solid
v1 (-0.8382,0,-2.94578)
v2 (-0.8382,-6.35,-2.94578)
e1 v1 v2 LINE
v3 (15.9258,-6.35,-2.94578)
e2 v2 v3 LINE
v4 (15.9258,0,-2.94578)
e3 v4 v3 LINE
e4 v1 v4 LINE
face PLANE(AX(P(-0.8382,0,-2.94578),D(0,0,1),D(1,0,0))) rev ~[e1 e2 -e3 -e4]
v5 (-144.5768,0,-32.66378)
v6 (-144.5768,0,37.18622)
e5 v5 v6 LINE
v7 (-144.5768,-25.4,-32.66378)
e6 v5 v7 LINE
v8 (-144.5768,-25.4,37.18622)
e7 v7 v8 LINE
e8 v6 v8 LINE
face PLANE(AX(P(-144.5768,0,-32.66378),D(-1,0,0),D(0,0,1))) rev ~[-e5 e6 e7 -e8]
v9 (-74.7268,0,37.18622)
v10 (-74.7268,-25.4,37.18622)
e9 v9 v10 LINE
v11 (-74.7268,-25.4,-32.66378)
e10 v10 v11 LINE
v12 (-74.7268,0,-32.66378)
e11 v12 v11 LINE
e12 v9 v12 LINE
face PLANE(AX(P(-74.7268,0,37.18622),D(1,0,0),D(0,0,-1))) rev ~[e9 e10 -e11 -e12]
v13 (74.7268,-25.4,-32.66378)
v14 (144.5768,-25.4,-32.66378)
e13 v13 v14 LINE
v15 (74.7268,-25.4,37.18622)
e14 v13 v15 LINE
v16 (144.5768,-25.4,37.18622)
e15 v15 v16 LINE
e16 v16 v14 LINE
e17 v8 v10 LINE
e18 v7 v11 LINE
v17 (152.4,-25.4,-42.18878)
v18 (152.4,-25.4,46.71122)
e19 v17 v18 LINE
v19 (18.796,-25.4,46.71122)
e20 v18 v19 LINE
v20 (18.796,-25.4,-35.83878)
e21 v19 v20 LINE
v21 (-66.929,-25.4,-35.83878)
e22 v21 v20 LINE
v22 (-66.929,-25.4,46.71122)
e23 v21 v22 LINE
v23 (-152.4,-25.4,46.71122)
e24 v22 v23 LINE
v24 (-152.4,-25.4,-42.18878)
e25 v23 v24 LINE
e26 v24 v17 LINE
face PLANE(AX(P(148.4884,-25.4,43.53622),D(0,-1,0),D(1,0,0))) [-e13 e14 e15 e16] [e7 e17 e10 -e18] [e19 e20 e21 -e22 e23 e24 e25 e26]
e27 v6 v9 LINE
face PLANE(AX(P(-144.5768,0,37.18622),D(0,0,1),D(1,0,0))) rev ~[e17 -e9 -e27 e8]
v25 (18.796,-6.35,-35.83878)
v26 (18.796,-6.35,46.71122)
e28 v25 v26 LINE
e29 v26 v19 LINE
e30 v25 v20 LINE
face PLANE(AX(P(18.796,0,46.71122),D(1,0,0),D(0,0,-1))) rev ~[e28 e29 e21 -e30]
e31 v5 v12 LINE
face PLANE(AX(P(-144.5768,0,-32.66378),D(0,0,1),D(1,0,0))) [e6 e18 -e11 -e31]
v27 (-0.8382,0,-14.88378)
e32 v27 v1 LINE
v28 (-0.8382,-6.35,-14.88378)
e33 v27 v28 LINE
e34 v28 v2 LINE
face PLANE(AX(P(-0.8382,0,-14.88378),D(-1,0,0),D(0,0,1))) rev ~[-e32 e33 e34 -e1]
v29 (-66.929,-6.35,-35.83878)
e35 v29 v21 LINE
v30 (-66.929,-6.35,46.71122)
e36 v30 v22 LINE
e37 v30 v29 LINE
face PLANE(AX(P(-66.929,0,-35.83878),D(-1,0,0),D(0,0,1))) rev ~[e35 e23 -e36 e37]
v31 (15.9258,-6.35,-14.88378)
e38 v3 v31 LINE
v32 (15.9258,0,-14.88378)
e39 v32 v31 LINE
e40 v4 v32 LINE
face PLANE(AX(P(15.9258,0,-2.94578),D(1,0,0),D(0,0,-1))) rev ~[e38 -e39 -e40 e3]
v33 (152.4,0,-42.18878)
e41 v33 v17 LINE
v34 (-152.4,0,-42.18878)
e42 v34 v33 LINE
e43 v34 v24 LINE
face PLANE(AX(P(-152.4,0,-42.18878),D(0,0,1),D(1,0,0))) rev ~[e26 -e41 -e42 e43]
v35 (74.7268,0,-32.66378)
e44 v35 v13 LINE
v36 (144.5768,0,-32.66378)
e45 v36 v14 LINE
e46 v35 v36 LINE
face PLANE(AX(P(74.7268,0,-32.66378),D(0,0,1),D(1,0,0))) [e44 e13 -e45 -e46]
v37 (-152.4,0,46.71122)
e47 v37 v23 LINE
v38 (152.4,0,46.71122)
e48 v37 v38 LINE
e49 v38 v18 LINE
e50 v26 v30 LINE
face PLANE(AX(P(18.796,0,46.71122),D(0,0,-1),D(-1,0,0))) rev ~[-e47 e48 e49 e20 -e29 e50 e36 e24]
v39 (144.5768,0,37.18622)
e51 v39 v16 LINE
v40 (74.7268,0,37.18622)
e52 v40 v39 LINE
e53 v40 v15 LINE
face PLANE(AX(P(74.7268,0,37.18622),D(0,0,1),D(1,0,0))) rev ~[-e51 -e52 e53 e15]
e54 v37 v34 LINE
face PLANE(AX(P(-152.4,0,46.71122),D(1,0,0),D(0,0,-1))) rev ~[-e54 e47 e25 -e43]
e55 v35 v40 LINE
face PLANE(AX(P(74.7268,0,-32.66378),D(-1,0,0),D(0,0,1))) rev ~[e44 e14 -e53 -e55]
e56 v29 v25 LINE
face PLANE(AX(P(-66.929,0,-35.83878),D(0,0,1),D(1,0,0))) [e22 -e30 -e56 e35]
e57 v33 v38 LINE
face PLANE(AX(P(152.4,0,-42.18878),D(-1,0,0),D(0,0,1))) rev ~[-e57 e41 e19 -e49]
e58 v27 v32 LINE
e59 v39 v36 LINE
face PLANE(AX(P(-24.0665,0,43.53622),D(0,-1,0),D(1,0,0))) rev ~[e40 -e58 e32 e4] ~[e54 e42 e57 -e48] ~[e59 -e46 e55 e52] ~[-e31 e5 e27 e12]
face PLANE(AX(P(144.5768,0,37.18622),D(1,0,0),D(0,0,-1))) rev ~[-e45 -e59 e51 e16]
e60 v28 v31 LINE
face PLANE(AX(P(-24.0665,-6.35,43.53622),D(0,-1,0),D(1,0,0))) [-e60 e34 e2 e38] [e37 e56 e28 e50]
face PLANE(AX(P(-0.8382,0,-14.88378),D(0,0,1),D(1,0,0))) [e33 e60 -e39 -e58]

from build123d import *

# Parameters (mm, degrees)
F0_W     = 7.8232
F0_H     = 6.35
F0_W_2   = 69.85
F0_H_2   = 3.175
F0_W_3   = 55.9308
F0_H_3   = 69.85
F0_W_4   = 7.7978
F0_H_4   = 12.7
F0_W_5   = 85.725
F1_DEPTH = 25.4
F0_W_6   = 2.8702
F0_H_5   = 5.1918955931
F0_W_7   = 66.0908
F0_H_6   = 4.9097025247
F0_H_7   = 13.4315382606
F0_W_8   = 16.764
F0_H_8   = 0.762
F2_DEPTH = 6.35


with BuildPart() as f1:
    # F0 (on Front) → F1 (new body)
    with BuildSketch(Plane.XZ):
        with Locations((148.4884, 43.5362195122)):
            Rectangle(F0_W, F0_H)
        with Locations((109.6518, 43.5362195122)):
            Rectangle(F0_W_2, F0_H)
        with Locations((148.4884, 38.7737195122)):
            Rectangle(F0_W, F0_H_2)
        with Locations((46.7614, 43.5362195122)):
            Rectangle(F0_W_3, F0_H)
        with Locations((109.6518, 38.7737195122)):
            Rectangle(F0_W_2, F0_H_2)
        with Locations((148.4884, 2.2612195122)):
            Rectangle(F0_W, F0_H_3)
        with Locations((46.7614, 38.7737195122)):
            Rectangle(F0_W_3, F0_H_2)
        with Locations((148.4884, -34.2512804878)):
            Rectangle(F0_W, F0_H_2)
        with Locations((-70.8279, 43.5362195122)):
            Rectangle(F0_W_4, F0_H)
        Polygon((74.7268, -2.1837804878), (74.7268, 37.1862195122), (18.796, 37.1862195122), (18.796, 3.0081151053), (18.796, -2.1837804878), align=None)
        with Locations((109.6518, -34.2512804878)):
            Rectangle(F0_W_2, F0_H_2)
        with Locations((148.4884, -39.0137804878)):
            Rectangle(F0_W, F0_H)
        with Locations((-109.6518, 43.5362195122)):
            Rectangle(F0_W_2, F0_H)
        with Locations((-70.8279, 38.7737195122)):
            Rectangle(F0_W_4, F0_H_2)
        with Locations((46.7614, -8.5337804878)):
            Rectangle(F0_W_3, F0_H_4)
        with Locations((109.6518, -39.0137804878)):
            Rectangle(F0_W_2, F0_H)
        Polygon((18.796, -32.6637804878), (74.7268, -32.6637804878), (74.7268, -14.8837804878), (18.796, -14.8837804878), (18.796, -28.3153187484), align=None)
        with Locations((46.7614, -34.2512804878)):
            Rectangle(F0_W_3, F0_H_2)
        with Locations((-148.4884, 43.5362195122)):
            Rectangle(F0_W, F0_H)
        with Locations((-109.6518, 38.7737195122)):
            Rectangle(F0_W_2, F0_H_2)
        Polygon((-66.929, 2.7259220369), (-66.929, 37.1862195122), (-74.7268, 37.1862195122), (-74.7268, -2.1837804878), (-66.929, -2.1837804878), align=None)
        with Locations((46.7614, -39.0137804878)):
            Rectangle(F0_W_3, F0_H)
        with Locations((-148.4884, 38.7737195122)):
            Rectangle(F0_W, F0_H_2)
        with Locations((-24.0665, -39.0137804878)):
            Rectangle(F0_W_5, F0_H)
        Polygon((-74.7268, -32.6637804878), (-66.929, -32.6637804878), (-66.929, -28.3153187484), (-66.929, -14.8837804878), (-74.7268, -14.8837804878), align=None)
        with Locations((-70.8279, -34.2512804878)):
            Rectangle(F0_W_4, F0_H_2)
        with Locations((-148.4884, 2.2612195122)):
            Rectangle(F0_W, F0_H_3)
        with Locations((-70.8279, -8.5337804878)):
            Rectangle(F0_W_4, F0_H_4)
        with Locations((-70.8279, -39.0137804878)):
            Rectangle(F0_W_4, F0_H)
        with Locations((-109.6518, -34.2512804878)):
            Rectangle(F0_W_2, F0_H_2)
        with Locations((-148.4884, -34.2512804878)):
            Rectangle(F0_W, F0_H_2)
        with Locations((-109.6518, -39.0137804878)):
            Rectangle(F0_W_2, F0_H)
        with Locations((-148.4884, -39.0137804878)):
            Rectangle(F0_W, F0_H)
    extrude(amount=F1_DEPTH)

    # F0 (on Front) → F2 (join)
    with BuildSketch(Plane.XZ):
        with Locations((-24.0665, 43.5362195122)):
            Rectangle(F0_W_5, F0_H)
        with Locations((-70.8279, 43.5362195122)):
            Rectangle(F0_W_4, F0_H)
        with Locations((-24.0665, 38.7737195122)):
            Rectangle(F0_W_5, F0_H_2)
        with Locations((-70.8279, 38.7737195122)):
            Rectangle(F0_W_4, F0_H_2)
        Polygon((18.796, 3.0081151053), (18.796, 37.1862195122), (-66.929, 37.1862195122), (-66.929, 2.7259220369), (-0.8382, 2.7259220369), (-0.8382, 3.0081151053), (15.9258, 3.0081151053), align=None)
        with Locations((17.3609, 0.4121673088)):
            Rectangle(F0_W_6, F0_H_5)
        Polygon((18.796, -14.8837804878), (18.796, -2.1837804878), (15.9258, -2.1837804878), (15.9258, -2.9457804878), (15.9258, -14.8837804878), align=None)
        Polygon((-66.929, -32.6637804878), (18.796, -32.6637804878), (18.796, -28.3153187484), (15.9258, -28.3153187484), (-0.8382, -28.3153187484), (-66.929, -28.3153187484), align=None)
        with Locations((-24.0665, -34.2512804878)):
            Rectangle(F0_W_5, F0_H_2)
        with Locations((-33.8836, 0.2710707746)):
            Rectangle(F0_W_7, F0_H_6)
        Polygon((15.9258, -2.1837804878), (15.9258, 3.0081151053), (-0.8382, 3.0081151053), (-0.8382, 2.7259220369), (-0.8382, -2.1837804878), align=None)
        with Locations((17.3609, -21.5995496181)):
            Rectangle(F0_W_6, F0_H_7)
        with Locations((7.5438, -2.5647804878)):
            Rectangle(F0_W_8, F0_H_8)
        Polygon((-0.8382, -2.1837804878), (-66.929, -2.1837804878), (-66.929, -14.8837804878), (-0.8382, -14.8837804878), (-0.8382, -2.9457804878), align=None)
        with Locations((7.5438, -21.5995496181)):
            Rectangle(F0_W_8, F0_H_7)
        with Locations((-33.8836, -21.5995496181)):
            Rectangle(F0_W_7, F0_H_7)
    extrude(amount=F2_DEPTH)


solid = f1.part
